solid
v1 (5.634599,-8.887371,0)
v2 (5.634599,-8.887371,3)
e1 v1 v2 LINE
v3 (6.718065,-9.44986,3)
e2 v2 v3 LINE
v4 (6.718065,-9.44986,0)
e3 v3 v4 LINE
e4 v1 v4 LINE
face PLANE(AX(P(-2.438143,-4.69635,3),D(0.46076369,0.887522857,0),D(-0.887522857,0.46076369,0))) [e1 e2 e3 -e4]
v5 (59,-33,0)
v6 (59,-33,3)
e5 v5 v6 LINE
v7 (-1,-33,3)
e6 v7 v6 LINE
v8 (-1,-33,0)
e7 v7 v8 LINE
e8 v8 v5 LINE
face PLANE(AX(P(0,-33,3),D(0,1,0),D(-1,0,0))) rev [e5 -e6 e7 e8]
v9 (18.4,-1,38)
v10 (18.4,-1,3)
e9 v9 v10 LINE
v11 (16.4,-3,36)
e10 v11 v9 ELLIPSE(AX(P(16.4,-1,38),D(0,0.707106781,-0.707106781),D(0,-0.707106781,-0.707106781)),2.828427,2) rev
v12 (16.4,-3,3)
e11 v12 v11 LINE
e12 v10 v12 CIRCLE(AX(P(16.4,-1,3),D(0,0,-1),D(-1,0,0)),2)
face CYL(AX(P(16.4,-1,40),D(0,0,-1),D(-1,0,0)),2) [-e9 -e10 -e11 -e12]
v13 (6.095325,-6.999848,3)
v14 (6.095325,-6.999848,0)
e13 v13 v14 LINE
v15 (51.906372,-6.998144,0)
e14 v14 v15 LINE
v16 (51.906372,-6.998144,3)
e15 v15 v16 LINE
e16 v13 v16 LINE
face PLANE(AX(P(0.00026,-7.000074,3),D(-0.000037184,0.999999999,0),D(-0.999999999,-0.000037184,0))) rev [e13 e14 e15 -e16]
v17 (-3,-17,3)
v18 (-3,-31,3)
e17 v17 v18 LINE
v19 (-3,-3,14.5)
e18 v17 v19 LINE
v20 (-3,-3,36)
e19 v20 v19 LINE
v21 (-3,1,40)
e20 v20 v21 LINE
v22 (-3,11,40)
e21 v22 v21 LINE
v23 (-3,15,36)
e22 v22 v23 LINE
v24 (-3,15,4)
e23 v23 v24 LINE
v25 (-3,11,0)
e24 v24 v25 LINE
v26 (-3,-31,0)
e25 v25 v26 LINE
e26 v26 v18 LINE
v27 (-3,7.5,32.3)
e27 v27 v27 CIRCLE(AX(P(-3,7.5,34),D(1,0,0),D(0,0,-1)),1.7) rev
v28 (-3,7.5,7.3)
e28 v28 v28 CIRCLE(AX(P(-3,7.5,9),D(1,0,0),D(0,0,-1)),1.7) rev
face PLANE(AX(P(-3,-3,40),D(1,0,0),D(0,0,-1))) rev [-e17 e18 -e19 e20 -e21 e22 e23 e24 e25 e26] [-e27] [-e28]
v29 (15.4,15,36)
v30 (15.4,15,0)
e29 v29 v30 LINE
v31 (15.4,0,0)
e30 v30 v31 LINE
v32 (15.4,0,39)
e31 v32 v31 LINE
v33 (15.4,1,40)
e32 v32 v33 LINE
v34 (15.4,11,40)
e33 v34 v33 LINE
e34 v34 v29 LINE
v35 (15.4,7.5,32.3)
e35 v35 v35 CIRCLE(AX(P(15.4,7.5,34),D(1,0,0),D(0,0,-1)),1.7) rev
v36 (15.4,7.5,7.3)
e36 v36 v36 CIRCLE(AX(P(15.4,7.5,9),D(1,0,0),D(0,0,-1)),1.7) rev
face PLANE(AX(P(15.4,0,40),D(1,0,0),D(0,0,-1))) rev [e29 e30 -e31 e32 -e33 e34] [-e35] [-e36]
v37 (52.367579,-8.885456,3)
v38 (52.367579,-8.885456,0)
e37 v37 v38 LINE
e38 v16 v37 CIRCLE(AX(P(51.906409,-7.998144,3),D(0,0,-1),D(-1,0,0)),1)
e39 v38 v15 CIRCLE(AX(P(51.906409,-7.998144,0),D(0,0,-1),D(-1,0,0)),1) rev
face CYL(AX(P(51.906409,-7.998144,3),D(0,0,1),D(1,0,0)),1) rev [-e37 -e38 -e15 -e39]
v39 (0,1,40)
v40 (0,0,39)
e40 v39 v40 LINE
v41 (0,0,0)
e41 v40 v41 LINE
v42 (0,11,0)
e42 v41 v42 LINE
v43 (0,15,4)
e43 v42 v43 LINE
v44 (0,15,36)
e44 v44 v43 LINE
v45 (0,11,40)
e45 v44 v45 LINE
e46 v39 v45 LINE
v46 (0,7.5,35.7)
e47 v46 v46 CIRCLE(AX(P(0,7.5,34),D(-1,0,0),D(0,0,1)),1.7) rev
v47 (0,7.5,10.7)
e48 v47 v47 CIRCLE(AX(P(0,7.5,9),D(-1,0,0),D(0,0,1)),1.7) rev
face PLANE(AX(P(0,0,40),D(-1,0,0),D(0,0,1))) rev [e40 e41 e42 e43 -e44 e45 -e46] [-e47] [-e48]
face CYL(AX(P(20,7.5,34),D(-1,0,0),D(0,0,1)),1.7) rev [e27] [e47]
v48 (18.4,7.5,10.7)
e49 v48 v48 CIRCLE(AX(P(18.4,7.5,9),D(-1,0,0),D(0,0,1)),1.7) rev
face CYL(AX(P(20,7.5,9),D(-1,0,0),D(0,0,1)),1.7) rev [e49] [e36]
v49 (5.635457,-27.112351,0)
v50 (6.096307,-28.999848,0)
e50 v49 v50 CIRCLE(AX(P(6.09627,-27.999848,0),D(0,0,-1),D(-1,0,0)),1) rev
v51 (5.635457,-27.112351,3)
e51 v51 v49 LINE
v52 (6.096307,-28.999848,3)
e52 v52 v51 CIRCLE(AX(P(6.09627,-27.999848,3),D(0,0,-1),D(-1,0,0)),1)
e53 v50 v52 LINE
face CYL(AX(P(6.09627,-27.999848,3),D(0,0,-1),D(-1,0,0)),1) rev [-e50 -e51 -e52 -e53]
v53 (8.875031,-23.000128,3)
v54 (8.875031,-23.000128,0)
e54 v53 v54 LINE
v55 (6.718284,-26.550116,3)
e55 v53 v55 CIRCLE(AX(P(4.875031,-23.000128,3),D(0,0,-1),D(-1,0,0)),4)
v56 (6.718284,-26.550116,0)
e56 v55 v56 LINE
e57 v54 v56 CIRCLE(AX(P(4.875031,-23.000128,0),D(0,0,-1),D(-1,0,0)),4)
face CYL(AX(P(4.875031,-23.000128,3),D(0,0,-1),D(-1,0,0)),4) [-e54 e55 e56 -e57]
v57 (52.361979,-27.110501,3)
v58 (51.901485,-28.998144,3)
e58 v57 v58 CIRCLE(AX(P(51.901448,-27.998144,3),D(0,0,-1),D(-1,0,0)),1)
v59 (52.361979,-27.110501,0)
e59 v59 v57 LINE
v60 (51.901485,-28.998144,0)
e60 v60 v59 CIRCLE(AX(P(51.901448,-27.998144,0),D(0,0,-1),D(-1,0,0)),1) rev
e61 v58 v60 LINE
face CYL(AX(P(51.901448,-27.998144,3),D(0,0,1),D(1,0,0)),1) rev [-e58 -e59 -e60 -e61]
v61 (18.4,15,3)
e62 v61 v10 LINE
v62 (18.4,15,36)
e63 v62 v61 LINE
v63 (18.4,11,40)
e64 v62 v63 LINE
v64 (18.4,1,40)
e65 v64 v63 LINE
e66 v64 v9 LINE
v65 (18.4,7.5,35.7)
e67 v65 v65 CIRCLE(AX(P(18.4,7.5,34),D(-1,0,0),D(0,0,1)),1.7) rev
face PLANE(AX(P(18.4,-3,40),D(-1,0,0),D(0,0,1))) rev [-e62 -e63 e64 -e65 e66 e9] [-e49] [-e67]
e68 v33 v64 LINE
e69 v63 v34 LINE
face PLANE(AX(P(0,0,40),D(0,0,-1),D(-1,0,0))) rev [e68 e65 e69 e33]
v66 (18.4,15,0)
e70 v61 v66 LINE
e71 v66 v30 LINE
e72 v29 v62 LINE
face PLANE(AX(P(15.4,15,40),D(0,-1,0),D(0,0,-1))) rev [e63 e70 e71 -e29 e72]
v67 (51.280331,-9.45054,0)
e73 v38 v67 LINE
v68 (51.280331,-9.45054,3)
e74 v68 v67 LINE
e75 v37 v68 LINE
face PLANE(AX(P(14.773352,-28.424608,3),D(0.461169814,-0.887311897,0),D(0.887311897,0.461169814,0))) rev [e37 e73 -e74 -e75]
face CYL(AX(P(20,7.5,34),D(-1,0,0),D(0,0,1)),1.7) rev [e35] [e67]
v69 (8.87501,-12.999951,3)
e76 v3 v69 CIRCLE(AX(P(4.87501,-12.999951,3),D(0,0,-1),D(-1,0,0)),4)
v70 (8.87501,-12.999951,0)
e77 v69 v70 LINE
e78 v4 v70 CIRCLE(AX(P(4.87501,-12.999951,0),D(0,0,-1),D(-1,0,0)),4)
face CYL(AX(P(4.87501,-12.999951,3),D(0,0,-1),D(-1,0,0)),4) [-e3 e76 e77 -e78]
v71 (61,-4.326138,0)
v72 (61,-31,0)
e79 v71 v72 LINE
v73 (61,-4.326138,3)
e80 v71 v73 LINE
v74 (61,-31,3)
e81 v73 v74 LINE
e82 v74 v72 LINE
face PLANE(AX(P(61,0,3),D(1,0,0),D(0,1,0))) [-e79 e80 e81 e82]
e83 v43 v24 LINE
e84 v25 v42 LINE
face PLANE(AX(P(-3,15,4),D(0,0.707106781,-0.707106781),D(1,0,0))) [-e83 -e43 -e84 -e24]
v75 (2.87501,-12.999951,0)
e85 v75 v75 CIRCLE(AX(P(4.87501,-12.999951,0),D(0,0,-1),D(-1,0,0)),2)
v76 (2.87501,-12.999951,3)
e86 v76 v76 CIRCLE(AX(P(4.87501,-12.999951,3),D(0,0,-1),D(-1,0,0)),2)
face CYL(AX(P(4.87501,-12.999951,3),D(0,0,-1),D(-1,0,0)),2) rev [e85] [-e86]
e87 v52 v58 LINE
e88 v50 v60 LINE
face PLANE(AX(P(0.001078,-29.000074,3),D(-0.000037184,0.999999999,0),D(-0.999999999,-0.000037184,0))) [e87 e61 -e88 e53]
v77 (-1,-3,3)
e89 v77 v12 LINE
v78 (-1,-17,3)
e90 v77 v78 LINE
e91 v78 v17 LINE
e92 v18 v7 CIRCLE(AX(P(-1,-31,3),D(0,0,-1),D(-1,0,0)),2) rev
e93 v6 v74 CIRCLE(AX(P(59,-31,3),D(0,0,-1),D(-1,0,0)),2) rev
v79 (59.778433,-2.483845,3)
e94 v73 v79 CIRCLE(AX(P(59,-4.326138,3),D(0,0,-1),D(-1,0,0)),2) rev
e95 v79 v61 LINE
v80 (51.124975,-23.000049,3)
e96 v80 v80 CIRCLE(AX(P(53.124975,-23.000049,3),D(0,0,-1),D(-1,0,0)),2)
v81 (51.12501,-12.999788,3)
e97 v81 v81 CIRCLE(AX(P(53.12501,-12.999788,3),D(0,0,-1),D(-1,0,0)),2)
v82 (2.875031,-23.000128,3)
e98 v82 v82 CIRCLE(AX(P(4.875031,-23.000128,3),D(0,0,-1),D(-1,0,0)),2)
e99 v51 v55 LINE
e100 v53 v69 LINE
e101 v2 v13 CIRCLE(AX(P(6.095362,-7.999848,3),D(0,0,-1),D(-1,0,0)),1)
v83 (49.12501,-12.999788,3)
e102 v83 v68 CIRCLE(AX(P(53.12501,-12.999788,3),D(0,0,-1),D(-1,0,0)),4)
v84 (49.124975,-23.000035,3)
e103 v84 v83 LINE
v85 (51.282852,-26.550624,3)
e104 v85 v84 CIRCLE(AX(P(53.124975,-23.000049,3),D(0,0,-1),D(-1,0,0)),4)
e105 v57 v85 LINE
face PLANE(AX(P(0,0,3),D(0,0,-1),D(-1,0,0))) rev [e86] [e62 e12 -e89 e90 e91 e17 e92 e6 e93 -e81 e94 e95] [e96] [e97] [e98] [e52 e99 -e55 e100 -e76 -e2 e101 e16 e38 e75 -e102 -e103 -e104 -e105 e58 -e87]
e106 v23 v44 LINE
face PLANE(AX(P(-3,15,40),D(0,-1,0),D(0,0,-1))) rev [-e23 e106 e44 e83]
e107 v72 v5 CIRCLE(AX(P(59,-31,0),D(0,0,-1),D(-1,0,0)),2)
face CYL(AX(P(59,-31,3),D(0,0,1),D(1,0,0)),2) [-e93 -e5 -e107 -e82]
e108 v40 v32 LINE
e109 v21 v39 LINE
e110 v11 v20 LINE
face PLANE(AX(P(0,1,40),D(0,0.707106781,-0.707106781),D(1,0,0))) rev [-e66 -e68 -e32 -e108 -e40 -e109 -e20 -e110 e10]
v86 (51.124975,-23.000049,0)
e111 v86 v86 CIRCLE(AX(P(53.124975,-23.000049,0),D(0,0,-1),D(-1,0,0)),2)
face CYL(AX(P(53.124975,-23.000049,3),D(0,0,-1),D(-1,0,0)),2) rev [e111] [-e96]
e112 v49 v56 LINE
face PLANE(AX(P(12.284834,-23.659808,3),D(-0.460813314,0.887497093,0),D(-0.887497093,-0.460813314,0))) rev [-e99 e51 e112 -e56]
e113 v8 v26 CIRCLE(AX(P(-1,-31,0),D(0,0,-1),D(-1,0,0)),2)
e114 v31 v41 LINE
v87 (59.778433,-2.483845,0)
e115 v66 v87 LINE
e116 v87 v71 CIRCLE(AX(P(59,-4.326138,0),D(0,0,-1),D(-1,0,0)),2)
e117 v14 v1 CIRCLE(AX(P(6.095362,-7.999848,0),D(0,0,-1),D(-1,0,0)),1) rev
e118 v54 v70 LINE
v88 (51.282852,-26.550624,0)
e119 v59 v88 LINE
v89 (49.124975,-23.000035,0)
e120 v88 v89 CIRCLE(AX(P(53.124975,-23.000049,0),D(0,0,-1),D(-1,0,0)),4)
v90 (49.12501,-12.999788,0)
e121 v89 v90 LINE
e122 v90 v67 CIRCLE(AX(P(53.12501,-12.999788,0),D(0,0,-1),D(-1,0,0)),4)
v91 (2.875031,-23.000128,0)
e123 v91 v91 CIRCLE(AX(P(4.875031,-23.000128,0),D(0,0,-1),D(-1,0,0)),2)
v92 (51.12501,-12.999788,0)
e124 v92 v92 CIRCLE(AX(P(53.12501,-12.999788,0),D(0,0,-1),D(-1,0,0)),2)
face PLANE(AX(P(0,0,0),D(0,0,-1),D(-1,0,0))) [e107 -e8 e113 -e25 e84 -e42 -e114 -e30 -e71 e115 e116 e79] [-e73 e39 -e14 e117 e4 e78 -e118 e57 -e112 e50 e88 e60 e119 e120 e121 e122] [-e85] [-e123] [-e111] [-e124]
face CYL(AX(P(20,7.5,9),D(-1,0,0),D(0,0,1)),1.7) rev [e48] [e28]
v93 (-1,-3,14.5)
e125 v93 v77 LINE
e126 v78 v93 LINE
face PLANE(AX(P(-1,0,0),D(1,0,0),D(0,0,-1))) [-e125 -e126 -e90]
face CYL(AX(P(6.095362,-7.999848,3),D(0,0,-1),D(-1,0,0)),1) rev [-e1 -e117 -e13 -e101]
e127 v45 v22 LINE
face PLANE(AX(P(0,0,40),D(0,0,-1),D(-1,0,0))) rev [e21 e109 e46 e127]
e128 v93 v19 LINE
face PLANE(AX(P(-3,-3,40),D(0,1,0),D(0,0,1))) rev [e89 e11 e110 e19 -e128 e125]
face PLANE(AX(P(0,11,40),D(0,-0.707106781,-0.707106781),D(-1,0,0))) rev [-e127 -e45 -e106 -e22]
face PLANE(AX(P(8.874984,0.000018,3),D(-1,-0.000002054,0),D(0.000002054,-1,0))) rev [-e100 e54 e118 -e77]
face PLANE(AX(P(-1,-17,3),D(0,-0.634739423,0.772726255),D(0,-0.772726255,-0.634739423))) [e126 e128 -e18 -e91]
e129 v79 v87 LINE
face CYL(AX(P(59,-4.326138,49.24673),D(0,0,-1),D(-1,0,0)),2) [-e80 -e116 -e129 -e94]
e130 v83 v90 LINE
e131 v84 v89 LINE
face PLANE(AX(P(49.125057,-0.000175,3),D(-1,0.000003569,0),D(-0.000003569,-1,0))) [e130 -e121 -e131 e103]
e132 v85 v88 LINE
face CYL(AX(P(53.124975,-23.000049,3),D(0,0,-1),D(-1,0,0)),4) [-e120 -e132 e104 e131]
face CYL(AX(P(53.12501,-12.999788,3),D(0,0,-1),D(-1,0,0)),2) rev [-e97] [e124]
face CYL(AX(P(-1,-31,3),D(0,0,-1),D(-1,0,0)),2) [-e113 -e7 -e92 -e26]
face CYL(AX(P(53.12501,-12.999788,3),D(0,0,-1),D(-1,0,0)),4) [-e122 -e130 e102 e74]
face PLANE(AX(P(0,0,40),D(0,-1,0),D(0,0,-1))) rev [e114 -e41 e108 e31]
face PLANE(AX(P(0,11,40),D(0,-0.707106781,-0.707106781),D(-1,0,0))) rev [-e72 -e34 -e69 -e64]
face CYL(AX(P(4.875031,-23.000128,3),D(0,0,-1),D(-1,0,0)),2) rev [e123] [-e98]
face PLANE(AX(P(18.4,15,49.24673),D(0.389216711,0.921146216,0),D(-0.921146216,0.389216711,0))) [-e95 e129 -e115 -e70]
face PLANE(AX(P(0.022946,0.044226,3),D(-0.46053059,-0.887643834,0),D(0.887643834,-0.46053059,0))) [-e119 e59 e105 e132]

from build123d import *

# Parameters (mm, degrees)
BOSS_EXTRUDE1_DEPTH     = 40
CUT_EXTRUDE1_DEPTH      = 20
CUT_EXTRUDE1_DEPTH_BACK = 20
SKETCH2_R               = 1.7
BOSS_EXTRUDE2_START     = -3
SKETCH4_W               = 64
SKETCH4_H               = 30
SKETCH4_R               = 2
BOSS_EXTRUDE2_DEPTH     = 3
FILLET1_R               = 1
BOSS_EXTRUDE3_START     = -3
BOSS_EXTRUDE3_DEPTH     = 3
FILLET2_R               = 2
BOSS_EXTRUDE4_START     = -2
BOSS_EXTRUDE4_DEPTH     = 2
CHAMFER1_SIZE           = 4
CHAMFER3_SIZE           = 4
FILLET3_R               = 2


with BuildPart() as part:
    # Sketch1 → Boss-Extrude1 (new body)
    with BuildSketch(Plane.XY):
        Polygon((-3, -3), (-3, 15), (0, 15), (0, 0), (15.4, 0), (15.4, 15), (18.4, 15), (18.4, -3), align=None)
    extrude(amount=BOSS_EXTRUDE1_DEPTH)

    # Sketch2 → Cut-Extrude1 (cut, two sides: drawn at the far end of the back side and taken through both)
    with BuildSketch(Plane(origin=(0, 0, 0), x_dir=(0, 0, -1), z_dir=(1, 0, 0)).offset(-CUT_EXTRUDE1_DEPTH_BACK)):
        with Locations(Location((-34, 7.5, 0), (0, 0, 180))):
            Circle(SKETCH2_R)
        with Locations(Location((-9, 7.5, 0), (0, 0, 180))):
            Circle(SKETCH2_R)
    extrude(amount=CUT_EXTRUDE1_DEPTH + CUT_EXTRUDE1_DEPTH_BACK, mode=Mode.SUBTRACT)

    # Sketch4 → Boss-Extrude2 (add)
    with BuildSketch(Plane(origin=(0, 0, 0), x_dir=(-1, 0, 0), z_dir=(0, 0, -1)).offset(BOSS_EXTRUDE2_START)):
        with Locations((-29, -18)):
            Rectangle(SKETCH4_W, SKETCH4_H)
        with Locations((-4.875030798, -23.000128049)):
            Circle(SKETCH4_R, mode=Mode.SUBTRACT)
        with Locations((-4.87501026, -12.999951056)):
            Circle(SKETCH4_R, mode=Mode.SUBTRACT)
        with Locations((-53.124974567, -23.00004902)):
            Circle(SKETCH4_R, mode=Mode.SUBTRACT)
        with Locations((-53.125010259, -12.999787804)):
            Circle(SKETCH4_R, mode=Mode.SUBTRACT)
        with BuildLine():
            Line((-1.999964331, -28.999999992), (-55.999999981, -28.997992053))
            Line((-55.999999981, -28.997992053), (-51.282852208, -26.550624356))
            ThreePointArc((-51.282852208, -26.550624356), (-49.706744703, -25.077476419), (-49.124974567, -23.00004902))
            Line((-49.124974567, -23.00004902), (-49.125010259, -12.999787804))
            ThreePointArc((-49.125010259, -12.999787804), (-49.706039872, -10.923579364), (-51.280331003, -9.450540216))
            Line((-51.280331003, -9.450540216), (-55.999146244, -6.99799207))
            Line((-55.999146244, -6.99799207), (-1.999146282, -7.000000007))
            Line((-1.999146282, -7.000000007), (-6.718065019, -9.449859627))
            ThreePointArc((-6.718065019, -9.449859627), (-8.293505472, -10.922960328), (-8.87501026, -12.999951056))
            Line((-8.87501026, -12.999951056), (-8.875030798, -23.000128049))
            ThreePointArc((-8.875030798, -23.000128049), (-8.293584076, -25.077023205), (-6.718284054, -26.550116421))
            Line((-6.718284054, -26.550116421), (-1.999964331, -28.999999992))
        make_face(mode=Mode.SUBTRACT)
    extrude(amount=BOSS_EXTRUDE2_DEPTH)

    # Fillet1
    fillet1_edges = [part.edges().sort_by_distance(p)[0] for p in [
        (55.999999981, -28.997992053, 1.5),
        (1.999964331, -28.999999992, 1.5),
        (1.999146282, -7.000000007, 1.5),
        (55.999146244, -6.99799207, 1.5),
    ]]
    fillet(fillet1_edges, radius=FILLET1_R)

    # Sketch6 → Boss-Extrude3 (add)
    with BuildSketch(Plane(origin=(0, 0, 0), x_dir=(-1, 0, 0), z_dir=(0, 0, -1)).offset(BOSS_EXTRUDE3_START)):
        Polygon((-18.4, 15), (-61, -3), (-18.4, -3), align=None)
    extrude(amount=BOSS_EXTRUDE3_DEPTH)

    # Fillet2
    fillet2_edges = [part.edges().sort_by_distance(p)[0] for p in [
        (61, -3, 1.5),
        (-3, -33, 1.5),
        (61, -33, 1.5),
    ]]
    fillet(fillet2_edges, radius=FILLET2_R)

    # Sketch7 → Boss-Extrude4 (add)
    with BuildSketch(Plane.ZY.offset(3).offset(BOSS_EXTRUDE4_START)):
        Polygon((3, -17), (14.5, -3), (3, -3), align=None)
    extrude(amount=BOSS_EXTRUDE4_DEPTH)

    # Chamfer1
    # the kernel refuses this chamfer: 4 mm, written as the material it takes off along each edge
    with BuildSketch(Plane(origin=(28.686731952, -3, 40), x_dir=(0, -0.027495876610586403, -0.9996219169112968), z_dir=(-1, 0, 0))) as chamfer1_piece_1:
        Polygon((CHAMFER1_SIZE * 0.999621916911, -CHAMFER1_SIZE * 0.0274958766106), (-CHAMFER1_SIZE * 0.0274958766106, -CHAMFER1_SIZE * 0.999621916911), (0, 0), align=None)
    extrude(amount=41.973463904, mode=Mode.SUBTRACT)

    # Chamfer3
    chamfer3_edges = [part.edges().sort_by_distance(p)[0] for p in [
        (-1.5, 15, 0),
        (16.9, 15, 40),
        (-1.5, 15, 40),
    ]]
    chamfer(chamfer3_edges, length=CHAMFER3_SIZE)

    # Fillet3
    fillet3_edges = [part.edges().sort_by_distance(p)[0] for p in [
        (18.4, -3, 19.5),
    ]]
    fillet(fillet3_edges, radius=FILLET3_R)


solid = part.part
